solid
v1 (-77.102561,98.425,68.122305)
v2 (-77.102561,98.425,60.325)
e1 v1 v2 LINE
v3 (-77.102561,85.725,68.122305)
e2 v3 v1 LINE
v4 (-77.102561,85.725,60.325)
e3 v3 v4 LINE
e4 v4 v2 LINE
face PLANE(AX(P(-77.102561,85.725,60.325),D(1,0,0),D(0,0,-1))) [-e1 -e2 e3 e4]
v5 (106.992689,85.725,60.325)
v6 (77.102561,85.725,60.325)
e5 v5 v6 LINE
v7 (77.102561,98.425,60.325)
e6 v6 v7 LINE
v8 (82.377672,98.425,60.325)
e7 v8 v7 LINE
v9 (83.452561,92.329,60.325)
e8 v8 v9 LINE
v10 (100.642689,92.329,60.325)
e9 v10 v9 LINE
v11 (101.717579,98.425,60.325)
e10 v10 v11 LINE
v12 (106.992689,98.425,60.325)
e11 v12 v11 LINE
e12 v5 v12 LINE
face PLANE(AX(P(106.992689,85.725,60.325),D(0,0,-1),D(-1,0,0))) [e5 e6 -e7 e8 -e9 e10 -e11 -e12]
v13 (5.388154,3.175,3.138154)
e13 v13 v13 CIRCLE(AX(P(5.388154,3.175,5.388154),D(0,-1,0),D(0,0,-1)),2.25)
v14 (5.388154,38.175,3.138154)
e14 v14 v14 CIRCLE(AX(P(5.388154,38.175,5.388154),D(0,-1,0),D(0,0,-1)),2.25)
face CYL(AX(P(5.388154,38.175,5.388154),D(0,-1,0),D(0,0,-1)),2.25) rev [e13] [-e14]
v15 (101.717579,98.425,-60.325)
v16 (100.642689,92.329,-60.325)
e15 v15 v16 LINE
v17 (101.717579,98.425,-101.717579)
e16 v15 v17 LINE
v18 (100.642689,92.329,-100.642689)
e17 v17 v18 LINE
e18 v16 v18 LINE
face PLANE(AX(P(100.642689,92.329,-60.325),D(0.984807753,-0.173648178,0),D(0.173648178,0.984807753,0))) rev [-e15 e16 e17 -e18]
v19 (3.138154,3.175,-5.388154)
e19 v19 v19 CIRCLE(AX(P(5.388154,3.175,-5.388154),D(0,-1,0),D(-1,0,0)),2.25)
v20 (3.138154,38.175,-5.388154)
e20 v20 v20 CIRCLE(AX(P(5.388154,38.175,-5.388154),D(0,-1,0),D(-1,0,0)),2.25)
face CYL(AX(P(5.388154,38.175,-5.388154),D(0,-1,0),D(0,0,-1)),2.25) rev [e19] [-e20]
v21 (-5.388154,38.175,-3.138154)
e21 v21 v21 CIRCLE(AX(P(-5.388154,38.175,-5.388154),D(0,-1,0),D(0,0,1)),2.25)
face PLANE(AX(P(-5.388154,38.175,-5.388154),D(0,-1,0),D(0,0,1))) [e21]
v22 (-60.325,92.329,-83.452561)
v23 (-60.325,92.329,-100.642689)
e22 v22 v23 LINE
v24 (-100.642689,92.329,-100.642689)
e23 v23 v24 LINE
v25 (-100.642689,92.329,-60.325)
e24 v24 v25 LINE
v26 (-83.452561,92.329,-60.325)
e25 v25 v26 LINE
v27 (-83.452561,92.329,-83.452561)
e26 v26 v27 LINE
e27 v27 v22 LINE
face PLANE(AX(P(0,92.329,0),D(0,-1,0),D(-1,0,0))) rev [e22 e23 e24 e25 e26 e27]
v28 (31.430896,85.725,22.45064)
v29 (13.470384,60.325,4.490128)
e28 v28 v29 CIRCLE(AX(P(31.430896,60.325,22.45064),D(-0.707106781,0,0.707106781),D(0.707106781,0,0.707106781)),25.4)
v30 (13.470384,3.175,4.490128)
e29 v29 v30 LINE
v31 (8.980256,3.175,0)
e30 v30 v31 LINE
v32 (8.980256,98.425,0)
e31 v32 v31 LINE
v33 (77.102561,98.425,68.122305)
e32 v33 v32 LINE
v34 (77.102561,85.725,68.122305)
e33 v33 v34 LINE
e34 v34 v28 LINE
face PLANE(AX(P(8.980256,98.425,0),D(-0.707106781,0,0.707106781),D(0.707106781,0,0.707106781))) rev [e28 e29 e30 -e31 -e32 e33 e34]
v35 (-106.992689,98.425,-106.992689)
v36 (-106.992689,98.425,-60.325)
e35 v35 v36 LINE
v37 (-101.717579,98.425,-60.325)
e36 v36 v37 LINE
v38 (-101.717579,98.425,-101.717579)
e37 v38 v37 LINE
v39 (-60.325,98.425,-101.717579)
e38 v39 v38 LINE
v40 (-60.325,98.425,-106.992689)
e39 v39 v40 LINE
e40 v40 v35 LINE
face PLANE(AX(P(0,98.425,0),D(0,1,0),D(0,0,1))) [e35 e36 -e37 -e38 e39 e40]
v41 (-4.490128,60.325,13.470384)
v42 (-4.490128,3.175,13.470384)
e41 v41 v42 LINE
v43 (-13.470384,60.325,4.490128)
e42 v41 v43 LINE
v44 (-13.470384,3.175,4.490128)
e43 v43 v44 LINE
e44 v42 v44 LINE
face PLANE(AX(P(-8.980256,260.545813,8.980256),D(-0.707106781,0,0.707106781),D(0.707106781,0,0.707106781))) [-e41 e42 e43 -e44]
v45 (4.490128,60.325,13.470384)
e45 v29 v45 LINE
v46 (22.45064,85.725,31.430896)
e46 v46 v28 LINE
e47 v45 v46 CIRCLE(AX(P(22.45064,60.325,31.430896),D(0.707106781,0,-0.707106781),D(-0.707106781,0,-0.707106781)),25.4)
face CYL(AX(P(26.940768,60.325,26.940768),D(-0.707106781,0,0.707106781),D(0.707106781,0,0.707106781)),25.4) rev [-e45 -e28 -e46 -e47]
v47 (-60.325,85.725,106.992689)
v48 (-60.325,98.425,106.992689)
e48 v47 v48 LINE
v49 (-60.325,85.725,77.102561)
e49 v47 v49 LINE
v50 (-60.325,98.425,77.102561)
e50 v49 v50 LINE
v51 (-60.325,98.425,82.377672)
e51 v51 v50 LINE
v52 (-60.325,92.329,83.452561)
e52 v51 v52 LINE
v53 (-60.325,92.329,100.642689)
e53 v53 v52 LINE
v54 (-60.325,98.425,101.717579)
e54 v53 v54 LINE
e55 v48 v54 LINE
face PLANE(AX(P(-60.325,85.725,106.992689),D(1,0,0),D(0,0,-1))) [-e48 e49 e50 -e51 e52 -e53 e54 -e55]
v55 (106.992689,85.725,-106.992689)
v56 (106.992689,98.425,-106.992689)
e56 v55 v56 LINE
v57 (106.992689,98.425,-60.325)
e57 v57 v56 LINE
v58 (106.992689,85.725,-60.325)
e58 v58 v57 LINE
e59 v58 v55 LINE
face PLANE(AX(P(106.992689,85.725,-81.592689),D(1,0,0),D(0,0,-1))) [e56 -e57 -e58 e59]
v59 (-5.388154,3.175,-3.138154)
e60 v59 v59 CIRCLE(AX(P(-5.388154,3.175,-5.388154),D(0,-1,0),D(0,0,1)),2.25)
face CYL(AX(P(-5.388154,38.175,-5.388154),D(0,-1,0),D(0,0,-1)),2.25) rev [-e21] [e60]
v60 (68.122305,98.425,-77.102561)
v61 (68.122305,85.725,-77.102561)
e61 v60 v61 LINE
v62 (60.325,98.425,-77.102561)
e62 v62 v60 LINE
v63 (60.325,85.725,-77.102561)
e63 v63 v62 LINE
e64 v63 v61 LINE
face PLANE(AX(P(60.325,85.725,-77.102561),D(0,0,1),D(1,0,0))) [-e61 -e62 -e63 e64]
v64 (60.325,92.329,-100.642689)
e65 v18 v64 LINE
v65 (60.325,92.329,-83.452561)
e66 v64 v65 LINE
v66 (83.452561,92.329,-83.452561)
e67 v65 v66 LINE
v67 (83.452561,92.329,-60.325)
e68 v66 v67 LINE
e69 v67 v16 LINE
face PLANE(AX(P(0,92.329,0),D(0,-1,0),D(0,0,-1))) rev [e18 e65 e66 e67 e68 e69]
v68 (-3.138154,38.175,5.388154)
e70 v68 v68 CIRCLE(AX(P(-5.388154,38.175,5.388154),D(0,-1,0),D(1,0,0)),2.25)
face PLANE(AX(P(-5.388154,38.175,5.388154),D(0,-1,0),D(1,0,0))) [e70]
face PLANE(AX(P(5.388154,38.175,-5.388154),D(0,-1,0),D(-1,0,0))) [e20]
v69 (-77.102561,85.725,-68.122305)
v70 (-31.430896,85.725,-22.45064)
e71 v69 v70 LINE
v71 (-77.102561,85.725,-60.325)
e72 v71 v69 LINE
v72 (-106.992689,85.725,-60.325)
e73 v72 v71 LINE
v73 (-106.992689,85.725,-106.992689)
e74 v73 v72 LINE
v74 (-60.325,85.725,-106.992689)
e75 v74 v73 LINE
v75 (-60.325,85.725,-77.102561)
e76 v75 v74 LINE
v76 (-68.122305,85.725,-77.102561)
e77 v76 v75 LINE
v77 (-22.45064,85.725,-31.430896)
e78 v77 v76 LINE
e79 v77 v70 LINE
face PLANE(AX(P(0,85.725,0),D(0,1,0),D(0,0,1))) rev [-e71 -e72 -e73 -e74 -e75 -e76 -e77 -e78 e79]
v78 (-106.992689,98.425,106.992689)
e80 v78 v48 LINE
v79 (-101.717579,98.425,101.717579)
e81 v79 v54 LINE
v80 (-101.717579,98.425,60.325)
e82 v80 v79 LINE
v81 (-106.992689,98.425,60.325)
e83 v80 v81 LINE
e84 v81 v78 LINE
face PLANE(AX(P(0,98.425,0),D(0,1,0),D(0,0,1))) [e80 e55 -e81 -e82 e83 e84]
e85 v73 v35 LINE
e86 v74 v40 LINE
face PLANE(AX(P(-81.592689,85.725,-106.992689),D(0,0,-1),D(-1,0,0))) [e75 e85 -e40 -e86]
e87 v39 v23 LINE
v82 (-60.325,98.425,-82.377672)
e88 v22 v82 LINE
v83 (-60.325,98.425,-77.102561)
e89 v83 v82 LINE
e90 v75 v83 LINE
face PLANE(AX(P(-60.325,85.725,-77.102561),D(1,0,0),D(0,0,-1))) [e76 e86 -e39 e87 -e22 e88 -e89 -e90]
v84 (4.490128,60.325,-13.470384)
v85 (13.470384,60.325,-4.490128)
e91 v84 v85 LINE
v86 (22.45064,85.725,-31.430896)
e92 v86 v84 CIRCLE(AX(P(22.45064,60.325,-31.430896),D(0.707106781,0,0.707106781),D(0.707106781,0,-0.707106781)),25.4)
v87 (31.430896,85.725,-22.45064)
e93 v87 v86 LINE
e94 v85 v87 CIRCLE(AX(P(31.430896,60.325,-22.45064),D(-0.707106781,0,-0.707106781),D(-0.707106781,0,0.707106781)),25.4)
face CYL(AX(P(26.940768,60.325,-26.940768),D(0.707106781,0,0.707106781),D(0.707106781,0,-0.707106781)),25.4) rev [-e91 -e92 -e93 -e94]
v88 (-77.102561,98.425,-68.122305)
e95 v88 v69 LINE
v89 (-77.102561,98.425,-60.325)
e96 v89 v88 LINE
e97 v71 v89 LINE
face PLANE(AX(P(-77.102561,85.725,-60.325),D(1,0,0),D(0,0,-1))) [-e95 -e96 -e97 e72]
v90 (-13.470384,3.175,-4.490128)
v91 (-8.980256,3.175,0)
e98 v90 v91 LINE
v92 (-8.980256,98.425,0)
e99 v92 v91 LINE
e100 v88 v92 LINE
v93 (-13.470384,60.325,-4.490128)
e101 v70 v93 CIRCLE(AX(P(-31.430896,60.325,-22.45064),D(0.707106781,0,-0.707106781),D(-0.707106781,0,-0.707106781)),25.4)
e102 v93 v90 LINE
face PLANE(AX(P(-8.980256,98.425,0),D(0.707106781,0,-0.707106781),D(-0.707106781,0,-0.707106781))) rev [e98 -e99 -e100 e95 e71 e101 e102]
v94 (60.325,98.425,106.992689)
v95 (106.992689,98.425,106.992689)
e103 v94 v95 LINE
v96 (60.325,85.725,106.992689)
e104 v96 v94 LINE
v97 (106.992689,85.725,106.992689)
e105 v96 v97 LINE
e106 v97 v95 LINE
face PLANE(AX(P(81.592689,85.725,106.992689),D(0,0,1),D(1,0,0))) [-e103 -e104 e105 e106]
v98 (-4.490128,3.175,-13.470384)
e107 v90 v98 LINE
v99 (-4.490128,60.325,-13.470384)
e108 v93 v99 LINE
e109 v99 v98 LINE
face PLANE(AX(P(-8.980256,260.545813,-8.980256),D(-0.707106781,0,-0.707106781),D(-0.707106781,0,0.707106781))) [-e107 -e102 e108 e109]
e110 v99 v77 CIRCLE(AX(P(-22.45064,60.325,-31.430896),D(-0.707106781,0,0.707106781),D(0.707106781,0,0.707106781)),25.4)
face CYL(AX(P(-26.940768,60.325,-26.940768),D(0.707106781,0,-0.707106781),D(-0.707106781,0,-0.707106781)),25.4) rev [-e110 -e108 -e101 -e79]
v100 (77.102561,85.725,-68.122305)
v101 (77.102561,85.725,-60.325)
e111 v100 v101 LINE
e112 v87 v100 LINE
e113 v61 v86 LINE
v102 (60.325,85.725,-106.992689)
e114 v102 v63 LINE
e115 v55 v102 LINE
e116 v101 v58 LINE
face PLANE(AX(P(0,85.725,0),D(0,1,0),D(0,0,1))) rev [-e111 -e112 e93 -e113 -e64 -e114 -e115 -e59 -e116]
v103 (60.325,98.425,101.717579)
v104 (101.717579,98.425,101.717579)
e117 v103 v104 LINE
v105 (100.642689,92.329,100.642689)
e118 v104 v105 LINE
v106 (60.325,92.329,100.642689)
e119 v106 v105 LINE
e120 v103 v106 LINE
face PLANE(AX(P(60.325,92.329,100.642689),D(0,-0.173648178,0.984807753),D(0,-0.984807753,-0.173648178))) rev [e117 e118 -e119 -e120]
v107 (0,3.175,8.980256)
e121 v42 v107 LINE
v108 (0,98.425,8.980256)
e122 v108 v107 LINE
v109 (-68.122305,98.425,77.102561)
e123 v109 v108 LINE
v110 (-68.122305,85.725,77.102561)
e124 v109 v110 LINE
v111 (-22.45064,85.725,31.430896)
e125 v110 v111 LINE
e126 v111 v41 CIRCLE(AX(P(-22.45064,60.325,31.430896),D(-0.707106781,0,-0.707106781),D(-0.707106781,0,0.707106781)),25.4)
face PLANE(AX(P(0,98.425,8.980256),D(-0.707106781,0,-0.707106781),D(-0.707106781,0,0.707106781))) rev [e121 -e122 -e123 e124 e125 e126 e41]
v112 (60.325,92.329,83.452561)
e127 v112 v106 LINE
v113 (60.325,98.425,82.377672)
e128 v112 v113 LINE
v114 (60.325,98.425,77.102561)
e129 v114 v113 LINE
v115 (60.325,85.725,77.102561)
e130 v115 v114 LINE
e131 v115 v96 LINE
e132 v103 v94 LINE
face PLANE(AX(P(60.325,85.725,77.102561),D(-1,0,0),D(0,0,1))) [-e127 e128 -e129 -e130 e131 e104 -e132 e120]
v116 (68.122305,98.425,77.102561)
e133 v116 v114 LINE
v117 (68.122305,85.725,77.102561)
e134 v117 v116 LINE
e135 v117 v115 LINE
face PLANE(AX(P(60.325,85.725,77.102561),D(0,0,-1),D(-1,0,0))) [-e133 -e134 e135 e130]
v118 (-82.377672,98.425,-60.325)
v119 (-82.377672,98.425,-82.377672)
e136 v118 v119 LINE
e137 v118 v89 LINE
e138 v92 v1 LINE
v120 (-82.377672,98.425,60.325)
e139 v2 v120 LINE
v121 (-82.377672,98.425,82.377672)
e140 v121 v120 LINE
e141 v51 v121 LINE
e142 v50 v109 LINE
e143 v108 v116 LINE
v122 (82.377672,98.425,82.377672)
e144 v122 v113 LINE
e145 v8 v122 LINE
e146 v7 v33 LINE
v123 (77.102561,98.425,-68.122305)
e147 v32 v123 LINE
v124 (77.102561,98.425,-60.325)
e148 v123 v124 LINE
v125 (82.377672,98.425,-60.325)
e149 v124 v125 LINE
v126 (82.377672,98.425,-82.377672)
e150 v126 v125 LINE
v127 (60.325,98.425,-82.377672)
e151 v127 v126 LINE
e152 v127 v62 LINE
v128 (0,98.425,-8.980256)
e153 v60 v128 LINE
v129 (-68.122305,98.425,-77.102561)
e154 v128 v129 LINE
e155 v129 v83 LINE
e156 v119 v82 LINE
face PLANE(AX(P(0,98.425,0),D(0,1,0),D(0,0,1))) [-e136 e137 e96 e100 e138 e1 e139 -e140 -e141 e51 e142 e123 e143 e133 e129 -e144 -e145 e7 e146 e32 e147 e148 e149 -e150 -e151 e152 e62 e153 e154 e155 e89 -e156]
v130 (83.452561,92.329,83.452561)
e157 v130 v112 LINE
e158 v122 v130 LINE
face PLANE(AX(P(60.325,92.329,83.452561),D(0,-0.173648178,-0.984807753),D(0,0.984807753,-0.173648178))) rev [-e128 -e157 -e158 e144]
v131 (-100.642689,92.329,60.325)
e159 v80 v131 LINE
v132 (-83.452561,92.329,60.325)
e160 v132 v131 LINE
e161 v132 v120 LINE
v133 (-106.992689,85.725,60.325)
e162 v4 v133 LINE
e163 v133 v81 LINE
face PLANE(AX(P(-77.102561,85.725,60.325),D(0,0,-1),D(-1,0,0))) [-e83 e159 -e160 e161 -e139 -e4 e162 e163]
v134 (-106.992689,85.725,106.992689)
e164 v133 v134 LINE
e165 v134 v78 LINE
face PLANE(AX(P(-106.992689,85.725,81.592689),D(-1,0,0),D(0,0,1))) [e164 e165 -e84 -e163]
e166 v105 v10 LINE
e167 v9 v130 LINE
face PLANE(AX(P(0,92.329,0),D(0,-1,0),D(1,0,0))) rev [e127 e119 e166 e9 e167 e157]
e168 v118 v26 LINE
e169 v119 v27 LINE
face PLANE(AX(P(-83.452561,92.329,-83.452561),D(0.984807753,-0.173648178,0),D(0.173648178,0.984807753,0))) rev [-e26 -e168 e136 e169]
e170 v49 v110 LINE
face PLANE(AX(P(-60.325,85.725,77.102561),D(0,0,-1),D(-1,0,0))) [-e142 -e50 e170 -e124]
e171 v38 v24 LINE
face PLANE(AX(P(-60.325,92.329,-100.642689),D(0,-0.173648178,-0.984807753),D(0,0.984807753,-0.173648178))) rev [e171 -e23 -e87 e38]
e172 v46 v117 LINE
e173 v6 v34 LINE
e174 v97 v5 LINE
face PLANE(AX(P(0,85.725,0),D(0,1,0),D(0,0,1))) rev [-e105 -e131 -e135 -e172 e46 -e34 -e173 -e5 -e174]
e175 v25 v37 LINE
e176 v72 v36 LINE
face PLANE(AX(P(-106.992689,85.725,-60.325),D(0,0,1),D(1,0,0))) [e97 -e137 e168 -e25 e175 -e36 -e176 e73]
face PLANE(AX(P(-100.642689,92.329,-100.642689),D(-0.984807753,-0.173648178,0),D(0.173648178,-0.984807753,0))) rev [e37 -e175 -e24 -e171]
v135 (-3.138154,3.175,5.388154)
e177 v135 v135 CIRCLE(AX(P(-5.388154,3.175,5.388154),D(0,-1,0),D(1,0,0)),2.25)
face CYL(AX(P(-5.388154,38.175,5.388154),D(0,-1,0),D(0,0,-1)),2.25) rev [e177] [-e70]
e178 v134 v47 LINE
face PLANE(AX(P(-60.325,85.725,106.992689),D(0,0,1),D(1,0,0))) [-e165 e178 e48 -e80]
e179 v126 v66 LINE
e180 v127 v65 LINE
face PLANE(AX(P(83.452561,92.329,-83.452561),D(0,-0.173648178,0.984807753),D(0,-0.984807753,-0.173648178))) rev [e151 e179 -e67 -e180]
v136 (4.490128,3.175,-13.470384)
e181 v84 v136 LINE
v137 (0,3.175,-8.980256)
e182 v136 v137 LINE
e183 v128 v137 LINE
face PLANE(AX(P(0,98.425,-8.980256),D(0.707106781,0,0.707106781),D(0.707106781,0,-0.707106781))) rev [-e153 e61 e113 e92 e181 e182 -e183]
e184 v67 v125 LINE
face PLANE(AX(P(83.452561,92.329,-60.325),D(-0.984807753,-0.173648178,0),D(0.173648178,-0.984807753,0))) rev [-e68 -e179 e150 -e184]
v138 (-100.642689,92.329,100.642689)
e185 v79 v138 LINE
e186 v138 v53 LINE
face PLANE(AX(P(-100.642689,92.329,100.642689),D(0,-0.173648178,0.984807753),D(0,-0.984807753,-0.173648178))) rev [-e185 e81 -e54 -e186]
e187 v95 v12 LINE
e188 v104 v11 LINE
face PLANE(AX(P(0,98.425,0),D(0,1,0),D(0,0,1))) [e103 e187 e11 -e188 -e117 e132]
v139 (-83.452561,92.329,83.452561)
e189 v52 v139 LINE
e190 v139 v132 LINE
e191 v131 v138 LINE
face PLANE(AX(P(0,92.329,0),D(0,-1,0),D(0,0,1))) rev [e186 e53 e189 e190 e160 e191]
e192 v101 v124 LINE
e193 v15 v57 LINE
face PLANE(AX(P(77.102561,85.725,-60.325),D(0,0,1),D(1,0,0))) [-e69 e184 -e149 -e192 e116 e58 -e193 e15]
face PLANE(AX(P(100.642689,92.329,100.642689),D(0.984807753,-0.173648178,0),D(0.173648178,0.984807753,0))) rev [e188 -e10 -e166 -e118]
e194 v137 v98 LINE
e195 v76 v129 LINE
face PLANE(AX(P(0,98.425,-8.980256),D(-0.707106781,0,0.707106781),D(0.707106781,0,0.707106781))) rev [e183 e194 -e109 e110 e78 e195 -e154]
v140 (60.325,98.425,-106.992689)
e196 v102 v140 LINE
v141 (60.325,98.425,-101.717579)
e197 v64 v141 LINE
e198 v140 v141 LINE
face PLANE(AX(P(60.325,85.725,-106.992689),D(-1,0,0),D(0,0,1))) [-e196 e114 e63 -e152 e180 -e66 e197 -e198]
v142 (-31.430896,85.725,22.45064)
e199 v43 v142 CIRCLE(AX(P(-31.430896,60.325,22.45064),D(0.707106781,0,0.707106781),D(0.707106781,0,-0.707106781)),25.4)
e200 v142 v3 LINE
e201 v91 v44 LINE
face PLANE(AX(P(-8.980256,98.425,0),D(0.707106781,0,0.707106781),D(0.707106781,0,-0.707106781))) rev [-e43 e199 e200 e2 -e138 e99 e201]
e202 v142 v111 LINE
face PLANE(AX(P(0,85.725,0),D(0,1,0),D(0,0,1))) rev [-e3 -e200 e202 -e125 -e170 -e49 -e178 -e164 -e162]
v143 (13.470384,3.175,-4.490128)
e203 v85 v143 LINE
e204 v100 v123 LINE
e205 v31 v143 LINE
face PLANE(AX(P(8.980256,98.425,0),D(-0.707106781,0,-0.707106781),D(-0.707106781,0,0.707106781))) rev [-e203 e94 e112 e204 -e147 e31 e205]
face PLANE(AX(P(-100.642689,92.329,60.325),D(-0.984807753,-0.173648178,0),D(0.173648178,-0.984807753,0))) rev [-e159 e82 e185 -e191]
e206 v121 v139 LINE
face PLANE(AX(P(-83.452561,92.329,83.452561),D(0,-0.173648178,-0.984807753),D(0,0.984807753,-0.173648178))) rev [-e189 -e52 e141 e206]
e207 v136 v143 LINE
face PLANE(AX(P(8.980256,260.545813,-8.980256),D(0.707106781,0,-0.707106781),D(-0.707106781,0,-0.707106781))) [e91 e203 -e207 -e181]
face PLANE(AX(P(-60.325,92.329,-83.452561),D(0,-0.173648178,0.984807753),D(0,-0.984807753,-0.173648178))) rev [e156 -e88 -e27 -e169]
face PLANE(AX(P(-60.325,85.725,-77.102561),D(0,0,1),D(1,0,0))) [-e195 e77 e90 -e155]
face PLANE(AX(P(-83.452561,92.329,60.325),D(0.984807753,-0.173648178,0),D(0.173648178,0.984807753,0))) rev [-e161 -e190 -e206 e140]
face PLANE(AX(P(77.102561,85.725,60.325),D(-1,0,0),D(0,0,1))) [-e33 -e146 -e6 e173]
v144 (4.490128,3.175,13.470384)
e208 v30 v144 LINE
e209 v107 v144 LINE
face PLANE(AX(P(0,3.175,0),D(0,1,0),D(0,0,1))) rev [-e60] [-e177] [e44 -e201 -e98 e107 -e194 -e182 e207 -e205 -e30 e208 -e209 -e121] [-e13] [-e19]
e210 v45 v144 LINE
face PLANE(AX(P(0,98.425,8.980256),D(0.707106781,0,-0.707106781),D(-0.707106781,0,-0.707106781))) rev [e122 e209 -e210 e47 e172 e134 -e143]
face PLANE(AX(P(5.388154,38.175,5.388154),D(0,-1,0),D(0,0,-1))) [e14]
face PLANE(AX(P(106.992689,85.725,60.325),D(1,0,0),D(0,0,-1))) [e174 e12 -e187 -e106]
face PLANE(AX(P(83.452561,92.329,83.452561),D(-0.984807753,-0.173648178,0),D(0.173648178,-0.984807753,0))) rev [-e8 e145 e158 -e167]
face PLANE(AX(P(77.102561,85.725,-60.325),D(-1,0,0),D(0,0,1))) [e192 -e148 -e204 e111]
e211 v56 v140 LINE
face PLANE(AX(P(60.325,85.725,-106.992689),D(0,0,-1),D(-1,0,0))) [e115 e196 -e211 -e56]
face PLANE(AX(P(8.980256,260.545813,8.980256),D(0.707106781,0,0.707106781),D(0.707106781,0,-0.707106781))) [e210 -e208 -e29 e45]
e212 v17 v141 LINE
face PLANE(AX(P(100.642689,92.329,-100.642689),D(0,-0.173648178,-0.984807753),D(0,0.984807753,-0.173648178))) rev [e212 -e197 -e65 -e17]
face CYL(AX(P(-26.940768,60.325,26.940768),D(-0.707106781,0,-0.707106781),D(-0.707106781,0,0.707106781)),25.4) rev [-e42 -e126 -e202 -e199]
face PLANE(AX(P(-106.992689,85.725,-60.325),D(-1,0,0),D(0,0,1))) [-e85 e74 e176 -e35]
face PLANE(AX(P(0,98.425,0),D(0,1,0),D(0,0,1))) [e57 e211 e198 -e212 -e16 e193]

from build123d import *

# Parameters (mm, degrees)
SKETCH5_R                = 154.617689271
BOSS_EXTRUDE4_DEPTH      = 3.175
BOSS_EXTRUDE9_DEPTH      = 95.25
CUT_EXTRUDE1_START       = -95.25
CUT_EXTRUDE1_DEPTH       = 82.55
BOSS_EXTRUDE10_DEPTH     = 12.7
CUT_EXTRUDE11_DEPTH      = 6.096
CUT_EXTRUDE11_DRAFT      = -10
FILLET2_R                = 25.4
CIRPATTERN7_COUNT        = 4
CIRPATTERN7_COPY_1_DEPTH = 6.096
CIRPATTERN7_COPY_1_DRAFT = -10
CIRPATTERN7_COPY_2_DEPTH = 6.096
CIRPATTERN7_COPY_2_DRAFT = -10
CIRPATTERN7_COPY_3_DEPTH = 6.096
CIRPATTERN7_COPY_3_DRAFT = -10
FILLET2_OF_CIRPATTERN7_R = 25.4
SKETCH26_R               = 154.617689271
CUT_EXTRUDE9_DEPTH       = 6.35
SKETCH27_R               = 2.249999945
CUT_EXTRUDE12_DEPTH      = 35.000000104
CIRPATTERN8_COUNT        = 4


# Read off the part's stored shape, not the designer's step: Cut-Extrude11
with BuildPart() as part:
    # Sketch5 → Boss-Extrude4 (new, symmetric)
    with BuildSketch(Plane(origin=(0, 0, 0), x_dir=(1, 0, 0), z_dir=(0, 1, 0))):
        with Locations(Location((0, 0, 0), (0, 0, 270))):
            Circle(SKETCH5_R)
    extrude(amount=BOSS_EXTRUDE4_DEPTH, both=True)

    # Sketch15 → Boss-Extrude9 (add)
    with BuildSketch(Plane(origin=(0, 3.175, 0), x_dir=(1, 0, 0), z_dir=(0, 1, 0))):
        Polygon((0, 8.980256121), (94.292689271, 103.272945392), (103.272945392, 94.292689271), (8.980256121, 0), (0, 0), align=None)
    boss_extrude9 = extrude(amount=BOSS_EXTRUDE9_DEPTH)

    # Sketch17 → Cut-Extrude1 (cut)
    with BuildSketch(Plane(origin=(0, 98.425, 0), x_dir=(1, 0, 0), z_dir=(0, 1, 0)).offset(CUT_EXTRUDE1_START)):
        Polygon((13.470384182, 4.490128061), (119.126854284, 110.146598163), (110.146598163, 119.126854284), (4.490128061, 13.470384182), align=None)
    cut_extrude1 = extrude(amount=CUT_EXTRUDE1_DEPTH, mode=Mode.SUBTRACT)

    # Sketch19 → Boss-Extrude10 (add)
    with BuildSketch(Plane(origin=(0, 98.425, 0), x_dir=(1, 0, 0), z_dir=(0, 1, 0))):
        Polygon((60.325, 106.992689271), (81.592689271, 106.992689271), (106.992689271, 106.992689271), (106.992689271, 81.592689271), (106.992689271, 60.325), (77.102561211, 60.325), (77.102561211, 77.102561211), (60.325, 77.102561211), align=None)
    boss_extrude10 = extrude(amount=-BOSS_EXTRUDE10_DEPTH)


with BuildPart() as cut_extrude11_tool:
    # Cut-Extrude11 outline → Cut-Extrude11 (with draft: the straight prism first)
    with BuildSketch(Plane(origin=(0, 92.329, 0), x_dir=(1, 0, 0), z_dir=(0, 1, 0))):
        Polygon((83.452561211, 60.325), (100.642689271, 60.325), (100.642689271, 100.642689271), (60.325, 100.642689271), (60.325, 83.452561211), (83.452561211, 83.452561211), align=None)
    extrude(amount=CUT_EXTRUDE11_DEPTH)
    # Cut-Extrude11: the draft: its side faces are tilted about the plane it starts from
    cut_extrude11_sides = [cut_extrude11_tool.faces().sort_by_distance(p)[0] for p in [
        (92.047625241, 95.377, -60.325),
        (100.642689271, 95.377, -80.483844636),
        (80.483844635, 95.377, -100.642689271),
        (60.325, 95.377, -92.047625241),
        (71.888780606, 95.377, -83.452561211),
        (83.452561211, 95.377, -71.888780606),
    ]]
    draft(cut_extrude11_sides, Plane(origin=(0, 92.329, 0), x_dir=(1, 0, 0), z_dir=(0, 1, 0)), CUT_EXTRUDE11_DRAFT)


with BuildPart() as part_1:
    add(part.part)

    # Cut-Extrude11: cut by cut_extrude11_tool
    add(cut_extrude11_tool.part, mode=Mode.SUBTRACT)

    # Fillet2
    fillet2_edges = [part_1.edges().sort_by_distance(p)[0] for p in [
        (8.980256121, 85.725, -8.980256121),
    ]]
    fillet(fillet2_edges, radius=FILLET2_R)

    # CirPattern7: Boss-Extrude9, Cut-Extrude1, Boss-Extrude10 ×4 about axis
    cirpattern7_axis = Axis((0, 0, 0), (0, 1, 0))
    add([boss_extrude9.rotate(cirpattern7_axis, i * 360 / CIRPATTERN7_COUNT) for i in range(1, CIRPATTERN7_COUNT)])
    add([cut_extrude1.rotate(cirpattern7_axis, i * 360 / CIRPATTERN7_COUNT) for i in range(1, CIRPATTERN7_COUNT)], mode=Mode.SUBTRACT)
    add([boss_extrude10.rotate(cirpattern7_axis, i * 360 / CIRPATTERN7_COUNT) for i in range(1, CIRPATTERN7_COUNT)])


with BuildPart() as cirpattern7_copy_1_tool:
    # CirPattern7 copy 1 sketch → CirPattern7 copy 1 (with draft: the straight prism first)
    with BuildSketch(Plane(origin=(0, 92.329, 0), x_dir=(0, 0, -1), z_dir=(0, 1, 0))):
        Polygon((83.452561211, 60.325), (100.642689271, 60.325), (100.642689271, 100.642689271), (60.325, 100.642689271), (60.325, 83.452561211), (83.452561211, 83.452561211), align=None)
    extrude(amount=CIRPATTERN7_COPY_1_DEPTH)
    # CirPattern7 copy 1: the draft: its side faces are tilted about the plane it starts from
    cirpattern7_copy_1_sides = [cirpattern7_copy_1_tool.faces().sort_by_distance(p)[0] for p in [
        (-60.325, 95.377, -92.047625241),
        (-80.483844636, 95.377, -100.642689271),
        (-100.642689271, 95.377, -80.483844635),
        (-92.047625241, 95.377, -60.325),
        (-83.452561211, 95.377, -71.888780606),
        (-71.888780606, 95.377, -83.452561211),
    ]]
    draft(cirpattern7_copy_1_sides, Plane(origin=(0, 92.329, 0), x_dir=(0, 0, -1), z_dir=(0, 1, 0)), CIRPATTERN7_COPY_1_DRAFT)


with BuildPart() as part_2:
    add(part_1.part)

    # CirPattern7 copy 1: cut by cirpattern7_copy_1_tool
    add(cirpattern7_copy_1_tool.part, mode=Mode.SUBTRACT)


with BuildPart() as cirpattern7_copy_2_tool:
    # CirPattern7 copy 2 sketch → CirPattern7 copy 2 (with draft: the straight prism first)
    with BuildSketch(Plane(origin=(0, 92.329, 0), x_dir=(-1, 0, 0), z_dir=(0, 1, 0))):
        Polygon((83.452561211, 60.325), (100.642689271, 60.325), (100.642689271, 100.642689271), (60.325, 100.642689271), (60.325, 83.452561211), (83.452561211, 83.452561211), align=None)
    extrude(amount=CIRPATTERN7_COPY_2_DEPTH)
    # CirPattern7 copy 2: the draft: its side faces are tilted about the plane it starts from
    cirpattern7_copy_2_sides = [cirpattern7_copy_2_tool.faces().sort_by_distance(p)[0] for p in [
        (-92.047625241, 95.377, 60.325),
        (-100.642689271, 95.377, 80.483844636),
        (-80.483844635, 95.377, 100.642689271),
        (-60.325, 95.377, 92.047625241),
        (-71.888780606, 95.377, 83.452561211),
        (-83.452561211, 95.377, 71.888780606),
    ]]
    draft(cirpattern7_copy_2_sides, Plane(origin=(0, 92.329, 0), x_dir=(-1, 0, 0), z_dir=(0, 1, 0)), CIRPATTERN7_COPY_2_DRAFT)


with BuildPart() as part_3:
    add(part_2.part)

    # CirPattern7 copy 2: cut by cirpattern7_copy_2_tool
    add(cirpattern7_copy_2_tool.part, mode=Mode.SUBTRACT)


with BuildPart() as cirpattern7_copy_3_tool:
    # CirPattern7 copy 3 sketch → CirPattern7 copy 3 (with draft: the straight prism first)
    with BuildSketch(Plane.ZX.offset(92.329)):
        Polygon((83.452561211, 60.325), (100.642689271, 60.325), (100.642689271, 100.642689271), (60.325, 100.642689271), (60.325, 83.452561211), (83.452561211, 83.452561211), align=None)
    extrude(amount=CIRPATTERN7_COPY_3_DEPTH)
    # CirPattern7 copy 3: the draft: its side faces are tilted about the plane it starts from
    cirpattern7_copy_3_sides = [cirpattern7_copy_3_tool.faces().sort_by_distance(p)[0] for p in [
        (60.325, 95.377, 92.047625241),
        (80.483844636, 95.377, 100.642689271),
        (100.642689271, 95.377, 80.483844635),
        (92.047625241, 95.377, 60.325),
        (83.452561211, 95.377, 71.888780606),
        (71.888780606, 95.377, 83.452561211),
    ]]
    draft(cirpattern7_copy_3_sides, Plane.ZX.offset(92.329), CIRPATTERN7_COPY_3_DRAFT)


with BuildPart() as part_4:
    add(part_3.part)

    # CirPattern7 copy 3: cut by cirpattern7_copy_3_tool
    add(cirpattern7_copy_3_tool.part, mode=Mode.SUBTRACT)

    # Fillet2 of CirPattern7
    fillet2_of_cirpattern7_edges = [part_4.edges().sort_by_distance(p)[0] for p in [
        (-8.980256121, 85.725, -8.980256121),
        (-8.980256121, 85.725, 8.980256121),
        (8.980256121, 85.725, 8.980256121),
    ]]
    fillet(fillet2_of_cirpattern7_edges, radius=FILLET2_OF_CIRPATTERN7_R)

    # Sketch26 → Cut-Extrude9 (cut)
    with BuildSketch(Plane(origin=(0, 3.175, 0), x_dir=(1, 0, 0), z_dir=(0, 1, 0))):
        Circle(SKETCH26_R)
    extrude(amount=-CUT_EXTRUDE9_DEPTH, mode=Mode.SUBTRACT)

    # Sketch27 → Cut-Extrude12 (cut)
    with BuildSketch(Plane.XZ.offset(-3.175)):
        with Locations(Location((5.388153673, 5.388153673, 0), (0, 0, 270))):
            Circle(SKETCH27_R)
    cut_extrude12 = extrude(amount=-CUT_EXTRUDE12_DEPTH, mode=Mode.SUBTRACT)

    # CirPattern8: Cut-Extrude12 ×4 about axis
    cirpattern8_axis = Axis((0, 0, 0), (0, 1, 0))
    for i in range(1, CIRPATTERN8_COUNT):
        add(cut_extrude12.rotate(cirpattern8_axis, i * 360 / CIRPATTERN8_COUNT), mode=Mode.SUBTRACT)


solid = part_4.part
